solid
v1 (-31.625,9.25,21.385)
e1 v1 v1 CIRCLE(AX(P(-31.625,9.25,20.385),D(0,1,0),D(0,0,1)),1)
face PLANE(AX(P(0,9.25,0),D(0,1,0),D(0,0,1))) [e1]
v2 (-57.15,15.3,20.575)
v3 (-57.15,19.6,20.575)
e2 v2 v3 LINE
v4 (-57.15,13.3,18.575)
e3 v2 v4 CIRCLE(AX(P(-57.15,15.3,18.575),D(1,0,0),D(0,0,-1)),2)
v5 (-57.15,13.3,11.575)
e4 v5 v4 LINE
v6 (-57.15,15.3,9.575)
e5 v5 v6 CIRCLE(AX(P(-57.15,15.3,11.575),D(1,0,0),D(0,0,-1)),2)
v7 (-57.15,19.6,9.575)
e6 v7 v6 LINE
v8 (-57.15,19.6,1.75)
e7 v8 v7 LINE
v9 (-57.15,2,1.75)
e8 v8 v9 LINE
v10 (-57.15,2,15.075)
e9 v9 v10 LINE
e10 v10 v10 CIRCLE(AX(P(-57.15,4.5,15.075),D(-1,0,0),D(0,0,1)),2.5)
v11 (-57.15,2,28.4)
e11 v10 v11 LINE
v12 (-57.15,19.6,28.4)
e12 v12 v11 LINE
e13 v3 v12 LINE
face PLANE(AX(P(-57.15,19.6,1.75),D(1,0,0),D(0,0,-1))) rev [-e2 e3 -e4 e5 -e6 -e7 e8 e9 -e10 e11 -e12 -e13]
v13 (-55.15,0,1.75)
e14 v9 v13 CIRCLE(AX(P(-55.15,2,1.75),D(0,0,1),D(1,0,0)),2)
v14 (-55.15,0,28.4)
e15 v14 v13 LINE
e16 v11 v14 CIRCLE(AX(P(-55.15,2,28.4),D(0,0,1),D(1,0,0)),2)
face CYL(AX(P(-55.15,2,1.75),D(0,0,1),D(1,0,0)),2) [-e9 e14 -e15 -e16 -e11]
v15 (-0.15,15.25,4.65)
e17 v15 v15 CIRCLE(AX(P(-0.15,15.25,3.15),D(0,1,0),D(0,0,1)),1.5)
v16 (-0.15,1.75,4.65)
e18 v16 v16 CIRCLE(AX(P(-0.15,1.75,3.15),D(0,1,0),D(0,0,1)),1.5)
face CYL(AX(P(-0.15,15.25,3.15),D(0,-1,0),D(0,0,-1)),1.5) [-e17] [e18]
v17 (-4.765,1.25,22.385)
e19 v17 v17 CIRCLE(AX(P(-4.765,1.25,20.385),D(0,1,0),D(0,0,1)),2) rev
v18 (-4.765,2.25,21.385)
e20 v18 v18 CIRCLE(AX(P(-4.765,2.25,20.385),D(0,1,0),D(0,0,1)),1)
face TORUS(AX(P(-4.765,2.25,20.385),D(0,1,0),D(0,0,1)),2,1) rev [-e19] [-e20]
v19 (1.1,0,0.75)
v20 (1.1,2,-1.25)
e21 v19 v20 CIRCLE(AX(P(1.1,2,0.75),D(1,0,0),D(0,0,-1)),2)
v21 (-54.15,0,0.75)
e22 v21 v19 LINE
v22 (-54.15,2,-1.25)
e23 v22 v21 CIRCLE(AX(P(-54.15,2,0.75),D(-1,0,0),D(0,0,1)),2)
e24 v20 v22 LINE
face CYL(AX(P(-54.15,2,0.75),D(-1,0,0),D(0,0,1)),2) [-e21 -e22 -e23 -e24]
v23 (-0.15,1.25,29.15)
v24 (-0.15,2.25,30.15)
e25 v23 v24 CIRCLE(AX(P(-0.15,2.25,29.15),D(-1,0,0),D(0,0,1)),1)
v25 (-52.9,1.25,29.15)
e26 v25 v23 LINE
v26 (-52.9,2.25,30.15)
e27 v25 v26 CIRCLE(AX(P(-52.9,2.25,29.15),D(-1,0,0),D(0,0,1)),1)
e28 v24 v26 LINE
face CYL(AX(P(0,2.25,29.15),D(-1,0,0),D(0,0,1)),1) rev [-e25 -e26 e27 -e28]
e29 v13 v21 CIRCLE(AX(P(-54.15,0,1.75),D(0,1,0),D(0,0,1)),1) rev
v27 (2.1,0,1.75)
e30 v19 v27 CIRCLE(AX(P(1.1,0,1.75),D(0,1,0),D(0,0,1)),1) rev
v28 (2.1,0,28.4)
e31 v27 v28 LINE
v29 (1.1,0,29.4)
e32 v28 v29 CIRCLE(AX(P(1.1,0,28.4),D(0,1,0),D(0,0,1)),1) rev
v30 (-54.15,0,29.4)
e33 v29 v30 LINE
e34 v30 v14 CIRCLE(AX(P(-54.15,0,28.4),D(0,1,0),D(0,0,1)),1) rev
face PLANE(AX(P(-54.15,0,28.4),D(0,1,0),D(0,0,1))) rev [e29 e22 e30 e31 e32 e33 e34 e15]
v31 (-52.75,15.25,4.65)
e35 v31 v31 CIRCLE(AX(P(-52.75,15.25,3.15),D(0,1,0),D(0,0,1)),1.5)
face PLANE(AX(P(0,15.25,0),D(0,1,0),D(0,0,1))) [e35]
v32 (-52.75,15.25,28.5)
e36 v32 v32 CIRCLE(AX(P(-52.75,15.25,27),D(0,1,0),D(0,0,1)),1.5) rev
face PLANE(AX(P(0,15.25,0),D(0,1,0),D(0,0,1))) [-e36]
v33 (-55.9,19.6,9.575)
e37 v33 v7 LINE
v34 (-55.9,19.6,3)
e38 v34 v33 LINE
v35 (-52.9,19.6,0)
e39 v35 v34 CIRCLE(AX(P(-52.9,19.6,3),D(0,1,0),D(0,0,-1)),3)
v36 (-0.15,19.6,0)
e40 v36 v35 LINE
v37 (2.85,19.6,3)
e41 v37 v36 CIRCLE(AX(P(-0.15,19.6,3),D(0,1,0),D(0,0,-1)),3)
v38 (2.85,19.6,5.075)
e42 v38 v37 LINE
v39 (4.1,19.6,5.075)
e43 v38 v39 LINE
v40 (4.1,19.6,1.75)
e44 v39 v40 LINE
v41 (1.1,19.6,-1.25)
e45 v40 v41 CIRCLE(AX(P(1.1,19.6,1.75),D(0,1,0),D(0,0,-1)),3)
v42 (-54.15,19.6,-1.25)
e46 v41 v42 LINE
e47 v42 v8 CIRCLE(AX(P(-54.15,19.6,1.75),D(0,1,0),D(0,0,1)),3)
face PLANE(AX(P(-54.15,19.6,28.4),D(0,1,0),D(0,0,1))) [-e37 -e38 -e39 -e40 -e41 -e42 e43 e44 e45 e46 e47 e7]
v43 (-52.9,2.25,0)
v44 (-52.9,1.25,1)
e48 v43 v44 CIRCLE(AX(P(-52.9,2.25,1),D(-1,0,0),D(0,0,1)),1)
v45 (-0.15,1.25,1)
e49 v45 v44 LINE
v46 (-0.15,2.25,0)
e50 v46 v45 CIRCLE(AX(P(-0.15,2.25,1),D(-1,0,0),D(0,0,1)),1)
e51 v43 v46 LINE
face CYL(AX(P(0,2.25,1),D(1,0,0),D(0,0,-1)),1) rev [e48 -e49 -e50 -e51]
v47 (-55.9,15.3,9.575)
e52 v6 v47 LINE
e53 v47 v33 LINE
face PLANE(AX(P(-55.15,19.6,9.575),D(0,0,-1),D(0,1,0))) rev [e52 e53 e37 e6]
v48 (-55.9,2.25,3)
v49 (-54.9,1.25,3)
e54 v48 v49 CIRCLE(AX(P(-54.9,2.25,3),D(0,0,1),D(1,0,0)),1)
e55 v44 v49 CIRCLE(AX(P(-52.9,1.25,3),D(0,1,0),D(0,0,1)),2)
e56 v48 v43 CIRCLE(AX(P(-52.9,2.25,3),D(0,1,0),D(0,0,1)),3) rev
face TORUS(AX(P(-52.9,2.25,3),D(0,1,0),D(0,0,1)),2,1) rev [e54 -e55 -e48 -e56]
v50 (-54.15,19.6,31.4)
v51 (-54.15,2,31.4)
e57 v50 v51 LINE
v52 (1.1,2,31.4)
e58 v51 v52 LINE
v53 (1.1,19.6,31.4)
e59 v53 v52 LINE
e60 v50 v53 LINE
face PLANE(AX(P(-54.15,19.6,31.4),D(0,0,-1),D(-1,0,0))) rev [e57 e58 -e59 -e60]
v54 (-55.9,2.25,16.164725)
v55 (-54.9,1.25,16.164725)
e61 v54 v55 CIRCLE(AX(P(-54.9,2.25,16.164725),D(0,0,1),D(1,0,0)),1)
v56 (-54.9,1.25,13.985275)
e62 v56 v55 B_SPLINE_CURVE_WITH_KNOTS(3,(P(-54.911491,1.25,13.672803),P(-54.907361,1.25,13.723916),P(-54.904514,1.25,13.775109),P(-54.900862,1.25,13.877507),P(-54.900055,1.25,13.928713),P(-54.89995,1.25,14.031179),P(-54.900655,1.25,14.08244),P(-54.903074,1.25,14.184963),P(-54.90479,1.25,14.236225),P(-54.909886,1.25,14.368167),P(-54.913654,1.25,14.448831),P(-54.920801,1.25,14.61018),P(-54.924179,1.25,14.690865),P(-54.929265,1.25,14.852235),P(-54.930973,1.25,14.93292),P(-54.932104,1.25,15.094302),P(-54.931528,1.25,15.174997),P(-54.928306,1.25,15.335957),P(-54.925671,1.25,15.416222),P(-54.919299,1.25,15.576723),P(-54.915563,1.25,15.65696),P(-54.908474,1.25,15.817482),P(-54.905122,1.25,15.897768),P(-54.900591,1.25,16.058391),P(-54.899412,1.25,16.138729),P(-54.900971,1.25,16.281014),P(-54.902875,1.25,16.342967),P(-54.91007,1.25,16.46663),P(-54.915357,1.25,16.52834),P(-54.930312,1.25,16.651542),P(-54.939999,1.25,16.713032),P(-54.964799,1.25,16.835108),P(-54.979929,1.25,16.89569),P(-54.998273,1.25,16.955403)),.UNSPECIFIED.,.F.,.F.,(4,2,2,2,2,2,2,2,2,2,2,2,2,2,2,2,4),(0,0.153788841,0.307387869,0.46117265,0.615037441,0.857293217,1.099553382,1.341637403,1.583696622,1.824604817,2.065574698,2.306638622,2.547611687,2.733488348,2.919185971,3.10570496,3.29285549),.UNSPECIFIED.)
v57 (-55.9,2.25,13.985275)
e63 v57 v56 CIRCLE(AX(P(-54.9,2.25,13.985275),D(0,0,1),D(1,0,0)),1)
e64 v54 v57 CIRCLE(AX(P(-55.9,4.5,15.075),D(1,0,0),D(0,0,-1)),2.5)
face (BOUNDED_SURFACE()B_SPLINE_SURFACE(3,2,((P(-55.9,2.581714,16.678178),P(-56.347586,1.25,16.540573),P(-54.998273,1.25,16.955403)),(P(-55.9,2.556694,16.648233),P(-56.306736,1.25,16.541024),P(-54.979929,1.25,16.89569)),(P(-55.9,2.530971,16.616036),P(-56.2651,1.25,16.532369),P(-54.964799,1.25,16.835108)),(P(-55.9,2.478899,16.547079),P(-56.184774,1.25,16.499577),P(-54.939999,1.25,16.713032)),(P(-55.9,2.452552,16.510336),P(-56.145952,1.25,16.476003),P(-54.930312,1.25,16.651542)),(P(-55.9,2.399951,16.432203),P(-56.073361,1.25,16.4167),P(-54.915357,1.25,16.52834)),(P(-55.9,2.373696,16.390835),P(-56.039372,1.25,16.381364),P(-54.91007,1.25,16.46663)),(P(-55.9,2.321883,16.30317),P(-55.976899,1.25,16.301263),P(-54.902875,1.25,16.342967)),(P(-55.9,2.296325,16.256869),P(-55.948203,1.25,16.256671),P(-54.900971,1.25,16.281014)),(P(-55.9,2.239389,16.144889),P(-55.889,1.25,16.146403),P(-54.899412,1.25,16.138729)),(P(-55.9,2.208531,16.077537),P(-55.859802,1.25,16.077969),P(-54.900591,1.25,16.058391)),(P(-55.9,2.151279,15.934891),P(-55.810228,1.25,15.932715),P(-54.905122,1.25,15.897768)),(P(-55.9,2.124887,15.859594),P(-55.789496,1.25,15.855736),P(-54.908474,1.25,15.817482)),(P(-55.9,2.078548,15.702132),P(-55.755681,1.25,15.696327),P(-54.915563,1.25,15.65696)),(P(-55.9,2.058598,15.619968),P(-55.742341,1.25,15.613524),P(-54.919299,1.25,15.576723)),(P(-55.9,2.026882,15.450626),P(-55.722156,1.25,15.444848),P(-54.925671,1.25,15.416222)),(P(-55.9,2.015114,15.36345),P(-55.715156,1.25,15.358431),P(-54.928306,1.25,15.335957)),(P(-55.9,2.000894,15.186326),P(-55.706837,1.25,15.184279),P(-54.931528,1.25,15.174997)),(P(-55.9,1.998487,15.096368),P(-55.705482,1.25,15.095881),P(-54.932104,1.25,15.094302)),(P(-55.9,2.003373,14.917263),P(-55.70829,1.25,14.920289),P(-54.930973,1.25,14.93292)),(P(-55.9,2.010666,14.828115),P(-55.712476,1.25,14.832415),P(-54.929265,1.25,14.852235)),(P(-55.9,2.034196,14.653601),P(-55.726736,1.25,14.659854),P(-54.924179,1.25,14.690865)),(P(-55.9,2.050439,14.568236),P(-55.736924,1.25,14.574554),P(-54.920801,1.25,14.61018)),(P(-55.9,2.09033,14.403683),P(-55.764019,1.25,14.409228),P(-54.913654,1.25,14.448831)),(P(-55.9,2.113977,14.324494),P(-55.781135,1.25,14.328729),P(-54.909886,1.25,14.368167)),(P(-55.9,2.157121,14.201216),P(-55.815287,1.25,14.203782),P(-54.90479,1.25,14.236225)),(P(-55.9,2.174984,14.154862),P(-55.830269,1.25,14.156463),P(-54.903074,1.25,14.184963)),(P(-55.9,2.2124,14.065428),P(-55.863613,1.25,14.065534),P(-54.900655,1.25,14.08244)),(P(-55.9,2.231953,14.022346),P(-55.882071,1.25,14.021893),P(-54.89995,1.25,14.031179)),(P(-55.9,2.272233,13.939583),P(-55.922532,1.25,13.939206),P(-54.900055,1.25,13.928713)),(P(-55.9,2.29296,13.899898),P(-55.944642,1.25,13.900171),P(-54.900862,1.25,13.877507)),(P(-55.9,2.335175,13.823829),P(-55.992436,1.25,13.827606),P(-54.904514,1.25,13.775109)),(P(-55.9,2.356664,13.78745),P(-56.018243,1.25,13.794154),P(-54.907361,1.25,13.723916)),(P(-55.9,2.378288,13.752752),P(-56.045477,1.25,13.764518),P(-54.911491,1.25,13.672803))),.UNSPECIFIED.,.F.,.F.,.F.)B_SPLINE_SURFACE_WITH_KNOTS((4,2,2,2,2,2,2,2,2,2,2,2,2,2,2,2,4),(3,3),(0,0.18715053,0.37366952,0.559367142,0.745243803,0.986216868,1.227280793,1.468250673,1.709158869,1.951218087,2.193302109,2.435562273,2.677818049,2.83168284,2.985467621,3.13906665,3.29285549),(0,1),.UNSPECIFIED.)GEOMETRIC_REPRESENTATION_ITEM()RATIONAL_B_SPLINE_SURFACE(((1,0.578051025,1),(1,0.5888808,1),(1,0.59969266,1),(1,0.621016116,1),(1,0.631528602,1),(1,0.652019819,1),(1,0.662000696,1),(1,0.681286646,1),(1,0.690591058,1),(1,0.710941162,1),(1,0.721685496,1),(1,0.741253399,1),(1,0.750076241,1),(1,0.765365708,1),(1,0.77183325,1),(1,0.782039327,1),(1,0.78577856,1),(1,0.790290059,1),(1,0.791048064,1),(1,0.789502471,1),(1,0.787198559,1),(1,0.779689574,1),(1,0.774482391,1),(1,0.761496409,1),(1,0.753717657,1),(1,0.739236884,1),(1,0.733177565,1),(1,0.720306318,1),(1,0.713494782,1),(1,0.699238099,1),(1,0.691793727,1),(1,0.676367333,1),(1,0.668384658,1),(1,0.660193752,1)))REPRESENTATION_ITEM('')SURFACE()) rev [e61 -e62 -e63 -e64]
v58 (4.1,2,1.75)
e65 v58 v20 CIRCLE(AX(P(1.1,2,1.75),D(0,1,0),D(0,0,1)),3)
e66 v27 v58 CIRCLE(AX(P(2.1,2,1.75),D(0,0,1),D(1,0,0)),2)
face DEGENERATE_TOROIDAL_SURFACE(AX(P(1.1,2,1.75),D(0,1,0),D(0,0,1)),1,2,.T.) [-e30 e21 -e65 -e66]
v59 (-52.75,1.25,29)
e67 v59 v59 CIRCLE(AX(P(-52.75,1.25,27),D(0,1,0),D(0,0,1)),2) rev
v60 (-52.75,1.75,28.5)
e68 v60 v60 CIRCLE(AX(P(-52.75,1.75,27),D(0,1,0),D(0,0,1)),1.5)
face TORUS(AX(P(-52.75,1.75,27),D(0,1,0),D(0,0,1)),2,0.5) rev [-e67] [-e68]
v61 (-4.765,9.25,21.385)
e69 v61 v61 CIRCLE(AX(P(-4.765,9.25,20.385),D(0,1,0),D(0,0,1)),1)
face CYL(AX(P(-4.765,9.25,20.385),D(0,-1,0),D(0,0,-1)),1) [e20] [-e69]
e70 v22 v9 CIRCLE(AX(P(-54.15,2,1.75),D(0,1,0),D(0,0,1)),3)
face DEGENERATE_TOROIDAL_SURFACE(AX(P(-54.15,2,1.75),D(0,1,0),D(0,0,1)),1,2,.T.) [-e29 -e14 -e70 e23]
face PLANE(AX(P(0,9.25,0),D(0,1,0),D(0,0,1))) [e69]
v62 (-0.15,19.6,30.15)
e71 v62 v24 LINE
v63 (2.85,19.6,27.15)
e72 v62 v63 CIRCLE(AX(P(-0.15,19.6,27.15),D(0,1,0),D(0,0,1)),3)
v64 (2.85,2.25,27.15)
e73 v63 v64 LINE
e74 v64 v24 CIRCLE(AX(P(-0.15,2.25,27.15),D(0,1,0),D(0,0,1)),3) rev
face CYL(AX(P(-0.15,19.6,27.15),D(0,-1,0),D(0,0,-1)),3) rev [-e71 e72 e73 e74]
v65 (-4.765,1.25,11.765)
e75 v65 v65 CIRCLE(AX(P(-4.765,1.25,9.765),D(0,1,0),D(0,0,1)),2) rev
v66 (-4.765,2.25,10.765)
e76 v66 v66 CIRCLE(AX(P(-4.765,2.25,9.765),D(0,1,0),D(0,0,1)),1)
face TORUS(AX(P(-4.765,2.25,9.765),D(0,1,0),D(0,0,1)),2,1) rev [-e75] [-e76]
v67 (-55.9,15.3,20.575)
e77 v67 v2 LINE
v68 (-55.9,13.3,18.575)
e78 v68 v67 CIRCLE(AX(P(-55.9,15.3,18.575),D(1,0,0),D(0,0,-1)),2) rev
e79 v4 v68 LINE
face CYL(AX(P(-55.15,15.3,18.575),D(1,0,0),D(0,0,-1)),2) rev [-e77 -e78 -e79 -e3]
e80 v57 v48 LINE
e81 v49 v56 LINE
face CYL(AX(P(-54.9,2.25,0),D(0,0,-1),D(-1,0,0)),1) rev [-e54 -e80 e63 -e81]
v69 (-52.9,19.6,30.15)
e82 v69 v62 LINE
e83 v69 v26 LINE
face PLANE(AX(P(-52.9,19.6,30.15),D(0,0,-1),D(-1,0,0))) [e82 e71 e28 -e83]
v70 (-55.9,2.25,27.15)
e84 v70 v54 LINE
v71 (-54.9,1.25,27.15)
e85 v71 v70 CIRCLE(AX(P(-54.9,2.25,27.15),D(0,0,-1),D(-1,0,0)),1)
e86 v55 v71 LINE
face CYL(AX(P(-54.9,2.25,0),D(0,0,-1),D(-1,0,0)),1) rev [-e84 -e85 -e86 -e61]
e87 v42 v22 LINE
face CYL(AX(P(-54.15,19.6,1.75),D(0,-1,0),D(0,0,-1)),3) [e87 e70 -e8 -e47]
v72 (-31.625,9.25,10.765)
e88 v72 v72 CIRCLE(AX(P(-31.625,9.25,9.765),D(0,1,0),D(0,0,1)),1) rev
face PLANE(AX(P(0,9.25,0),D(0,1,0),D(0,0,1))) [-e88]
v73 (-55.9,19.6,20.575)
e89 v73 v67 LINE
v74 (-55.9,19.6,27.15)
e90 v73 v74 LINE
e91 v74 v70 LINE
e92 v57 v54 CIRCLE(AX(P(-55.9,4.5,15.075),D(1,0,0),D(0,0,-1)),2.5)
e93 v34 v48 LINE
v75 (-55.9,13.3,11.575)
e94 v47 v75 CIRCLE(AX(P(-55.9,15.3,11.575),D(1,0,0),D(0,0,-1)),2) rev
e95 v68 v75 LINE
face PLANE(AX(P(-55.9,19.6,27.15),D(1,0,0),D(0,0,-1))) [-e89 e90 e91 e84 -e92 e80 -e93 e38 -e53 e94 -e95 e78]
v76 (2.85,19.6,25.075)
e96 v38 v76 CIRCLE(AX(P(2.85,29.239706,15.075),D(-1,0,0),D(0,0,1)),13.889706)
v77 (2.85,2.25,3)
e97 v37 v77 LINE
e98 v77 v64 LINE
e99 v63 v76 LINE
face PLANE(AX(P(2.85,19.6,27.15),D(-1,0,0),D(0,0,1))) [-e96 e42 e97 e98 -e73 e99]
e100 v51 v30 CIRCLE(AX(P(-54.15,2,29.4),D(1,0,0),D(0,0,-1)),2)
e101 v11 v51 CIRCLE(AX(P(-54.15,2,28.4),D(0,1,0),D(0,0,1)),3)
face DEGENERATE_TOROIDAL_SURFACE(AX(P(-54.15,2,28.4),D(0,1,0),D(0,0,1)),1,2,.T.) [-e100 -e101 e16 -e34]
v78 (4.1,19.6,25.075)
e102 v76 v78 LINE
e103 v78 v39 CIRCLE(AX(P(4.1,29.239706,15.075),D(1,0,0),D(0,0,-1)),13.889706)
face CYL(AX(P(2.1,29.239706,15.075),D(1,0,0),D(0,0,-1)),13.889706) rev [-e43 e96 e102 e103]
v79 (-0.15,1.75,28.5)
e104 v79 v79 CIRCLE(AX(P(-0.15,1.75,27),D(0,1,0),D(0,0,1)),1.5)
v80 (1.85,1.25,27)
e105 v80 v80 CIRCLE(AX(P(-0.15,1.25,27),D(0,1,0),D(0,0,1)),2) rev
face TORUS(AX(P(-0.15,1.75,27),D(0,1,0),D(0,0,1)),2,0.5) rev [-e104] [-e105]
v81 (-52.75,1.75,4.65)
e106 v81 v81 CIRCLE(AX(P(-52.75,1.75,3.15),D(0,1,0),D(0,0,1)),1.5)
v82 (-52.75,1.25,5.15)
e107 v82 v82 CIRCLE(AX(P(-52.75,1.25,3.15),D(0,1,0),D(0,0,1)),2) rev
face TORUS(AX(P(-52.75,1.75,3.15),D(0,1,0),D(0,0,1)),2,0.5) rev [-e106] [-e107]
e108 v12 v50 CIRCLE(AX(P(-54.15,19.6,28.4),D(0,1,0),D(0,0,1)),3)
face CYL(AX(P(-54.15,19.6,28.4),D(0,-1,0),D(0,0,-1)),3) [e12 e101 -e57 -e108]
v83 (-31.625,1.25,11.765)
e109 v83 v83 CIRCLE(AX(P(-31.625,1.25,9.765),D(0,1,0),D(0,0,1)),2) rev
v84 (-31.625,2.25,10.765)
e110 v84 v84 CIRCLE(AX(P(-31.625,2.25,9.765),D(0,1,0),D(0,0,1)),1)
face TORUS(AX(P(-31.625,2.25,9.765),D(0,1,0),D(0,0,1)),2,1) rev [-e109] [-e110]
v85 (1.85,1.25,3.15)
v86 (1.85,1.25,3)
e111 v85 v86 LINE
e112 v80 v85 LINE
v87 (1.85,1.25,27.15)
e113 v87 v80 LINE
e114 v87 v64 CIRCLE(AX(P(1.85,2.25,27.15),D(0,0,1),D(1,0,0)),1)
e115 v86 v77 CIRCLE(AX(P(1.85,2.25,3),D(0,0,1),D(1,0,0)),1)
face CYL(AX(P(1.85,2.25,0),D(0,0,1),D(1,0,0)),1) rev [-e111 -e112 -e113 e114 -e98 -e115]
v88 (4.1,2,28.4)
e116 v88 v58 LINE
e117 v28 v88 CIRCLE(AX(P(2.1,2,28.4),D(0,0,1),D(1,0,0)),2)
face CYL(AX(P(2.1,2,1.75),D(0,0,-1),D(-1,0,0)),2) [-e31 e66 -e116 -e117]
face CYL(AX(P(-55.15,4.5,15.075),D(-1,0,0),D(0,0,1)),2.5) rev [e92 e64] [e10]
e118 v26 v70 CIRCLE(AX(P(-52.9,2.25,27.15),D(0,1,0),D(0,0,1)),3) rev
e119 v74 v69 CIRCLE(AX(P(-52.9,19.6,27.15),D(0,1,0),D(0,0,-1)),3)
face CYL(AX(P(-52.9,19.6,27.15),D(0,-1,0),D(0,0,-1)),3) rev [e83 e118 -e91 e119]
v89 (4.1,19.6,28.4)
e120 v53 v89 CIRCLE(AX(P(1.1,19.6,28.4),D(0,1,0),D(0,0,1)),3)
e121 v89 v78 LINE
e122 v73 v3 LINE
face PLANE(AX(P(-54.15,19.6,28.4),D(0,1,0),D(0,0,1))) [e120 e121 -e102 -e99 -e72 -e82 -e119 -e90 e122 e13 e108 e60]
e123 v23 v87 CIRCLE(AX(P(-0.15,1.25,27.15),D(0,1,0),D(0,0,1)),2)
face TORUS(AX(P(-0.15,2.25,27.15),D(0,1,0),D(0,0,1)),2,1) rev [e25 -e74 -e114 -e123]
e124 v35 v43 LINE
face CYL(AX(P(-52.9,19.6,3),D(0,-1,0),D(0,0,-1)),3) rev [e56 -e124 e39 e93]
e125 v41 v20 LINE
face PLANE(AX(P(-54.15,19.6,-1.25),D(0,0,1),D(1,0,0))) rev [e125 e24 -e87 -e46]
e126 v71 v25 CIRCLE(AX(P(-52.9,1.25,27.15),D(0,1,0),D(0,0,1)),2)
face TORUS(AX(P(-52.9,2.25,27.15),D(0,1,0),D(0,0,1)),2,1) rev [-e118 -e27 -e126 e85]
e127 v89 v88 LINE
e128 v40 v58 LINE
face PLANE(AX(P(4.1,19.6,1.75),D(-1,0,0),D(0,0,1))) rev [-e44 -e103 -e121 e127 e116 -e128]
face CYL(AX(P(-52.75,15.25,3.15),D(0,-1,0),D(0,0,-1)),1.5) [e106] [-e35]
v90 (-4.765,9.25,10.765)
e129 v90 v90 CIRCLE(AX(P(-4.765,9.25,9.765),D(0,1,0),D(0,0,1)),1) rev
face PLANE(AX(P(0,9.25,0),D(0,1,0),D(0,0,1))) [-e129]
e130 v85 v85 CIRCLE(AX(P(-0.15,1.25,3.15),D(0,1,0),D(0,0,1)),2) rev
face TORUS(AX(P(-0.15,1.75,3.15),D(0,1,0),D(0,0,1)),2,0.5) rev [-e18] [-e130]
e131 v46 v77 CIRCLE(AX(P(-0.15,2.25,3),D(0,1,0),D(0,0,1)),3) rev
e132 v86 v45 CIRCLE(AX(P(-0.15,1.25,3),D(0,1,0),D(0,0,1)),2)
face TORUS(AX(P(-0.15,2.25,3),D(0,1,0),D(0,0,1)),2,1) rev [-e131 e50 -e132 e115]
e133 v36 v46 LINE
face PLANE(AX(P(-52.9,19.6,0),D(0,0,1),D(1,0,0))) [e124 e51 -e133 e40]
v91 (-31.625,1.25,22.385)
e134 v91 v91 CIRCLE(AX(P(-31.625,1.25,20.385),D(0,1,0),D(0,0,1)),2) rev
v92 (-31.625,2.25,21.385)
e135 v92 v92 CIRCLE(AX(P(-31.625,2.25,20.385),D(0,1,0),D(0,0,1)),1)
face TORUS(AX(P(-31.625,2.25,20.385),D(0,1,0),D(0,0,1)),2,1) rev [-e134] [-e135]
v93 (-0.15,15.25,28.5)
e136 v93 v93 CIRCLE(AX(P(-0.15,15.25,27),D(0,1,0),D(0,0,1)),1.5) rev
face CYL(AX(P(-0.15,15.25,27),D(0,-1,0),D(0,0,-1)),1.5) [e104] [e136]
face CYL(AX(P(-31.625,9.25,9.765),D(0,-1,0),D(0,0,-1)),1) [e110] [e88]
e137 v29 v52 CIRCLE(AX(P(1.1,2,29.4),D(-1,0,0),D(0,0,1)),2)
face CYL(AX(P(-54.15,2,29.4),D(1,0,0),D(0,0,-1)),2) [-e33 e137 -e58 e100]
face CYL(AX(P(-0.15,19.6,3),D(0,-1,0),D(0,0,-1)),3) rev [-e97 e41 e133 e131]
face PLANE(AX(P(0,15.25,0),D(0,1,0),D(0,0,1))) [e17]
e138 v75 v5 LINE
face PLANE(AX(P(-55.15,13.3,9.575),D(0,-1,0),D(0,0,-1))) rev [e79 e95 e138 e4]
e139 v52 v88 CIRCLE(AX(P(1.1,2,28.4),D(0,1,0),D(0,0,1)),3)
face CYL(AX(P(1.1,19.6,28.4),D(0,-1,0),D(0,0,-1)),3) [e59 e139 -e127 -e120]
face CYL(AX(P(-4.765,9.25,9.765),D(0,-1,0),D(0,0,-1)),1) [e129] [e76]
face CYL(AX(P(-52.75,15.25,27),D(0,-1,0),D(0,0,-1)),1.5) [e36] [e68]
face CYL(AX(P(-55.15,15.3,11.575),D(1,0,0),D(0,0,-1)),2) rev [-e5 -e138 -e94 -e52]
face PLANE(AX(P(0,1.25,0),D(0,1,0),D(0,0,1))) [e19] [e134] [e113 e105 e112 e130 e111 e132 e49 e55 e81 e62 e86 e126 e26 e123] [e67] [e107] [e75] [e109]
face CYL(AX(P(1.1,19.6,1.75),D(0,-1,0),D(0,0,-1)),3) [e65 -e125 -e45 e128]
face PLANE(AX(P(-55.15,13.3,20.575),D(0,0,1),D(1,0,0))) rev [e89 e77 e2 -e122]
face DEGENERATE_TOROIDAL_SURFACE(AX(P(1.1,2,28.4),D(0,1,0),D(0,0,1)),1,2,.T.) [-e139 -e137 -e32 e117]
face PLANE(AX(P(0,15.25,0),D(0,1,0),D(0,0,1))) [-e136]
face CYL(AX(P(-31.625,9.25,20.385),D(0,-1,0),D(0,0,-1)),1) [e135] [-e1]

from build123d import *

# Parameters (mm, degrees)
BOSS_EXTRUDE2_DEPTH = 19.6
SKETCH3_W           = 58.75
SKETCH3_H           = 30.15
BOSS_EXTRUDE3_DEPTH = 1.25
SKETCH5_R           = 1.5
BOSS_EXTRUDE4_DEPTH = 14
FILLET1_R           = 0.5
SKETCH6_R           = 1
BOSS_EXTRUDE6_DEPTH = 8
FILLET3_R           = 1
FILLET4_R           = 2
SKETCH7_R           = 2.5
SKETCH7_W           = 11
SKETCH7_H           = 6.3
CUT_EXTRUDE1_DEPTH  = 2
FILLET7_R           = 1
CUT_EXTRUDE2_DEPTH  = 2
FILLET8_R           = 2


with BuildPart() as part:
    # Sketch2 → Boss-Extrude2 (new body)
    with BuildSketch(Plane(origin=(0, 0, 0), x_dir=(1, 0, 0), z_dir=(0, 1, 0))):
        with BuildLine():
            Line((-54.15, 1.25), (1.1, 1.25))
            ThreePointArc((1.1, 1.25), (3.221320344, 0.371320344), (4.1, -1.75))
            Line((4.1, -1.75), (4.1, -28.4))
            ThreePointArc((4.1, -28.4), (3.221320344, -30.521320344), (1.1, -31.4))
            Line((1.1, -31.4), (-54.15, -31.4))
            ThreePointArc((-54.15, -31.4), (-56.271320344, -30.521320344), (-57.15, -28.4))
            Line((-57.15, -28.4), (-57.15, -1.75))
            ThreePointArc((-57.15, -1.75), (-56.271320344, 0.371320344), (-54.15, 1.25))
        make_face()
        with BuildLine():
            Line((-52.9, -30.15), (-0.15, -30.15))
            ThreePointArc((-0.15, -30.15), (1.971320344, -29.271320344), (2.85, -27.15))
            Line((2.85, -27.15), (2.85, -3))
            ThreePointArc((2.85, -3), (1.971320344, -0.878679656), (-0.15, 0))
            Line((-0.15, 0), (-52.9, 0))
            ThreePointArc((-52.9, 0), (-55.021320344, -0.878679656), (-55.9, -3))
            Line((-55.9, -3), (-55.9, -27.15))
            ThreePointArc((-55.9, -27.15), (-55.021320344, -29.271320344), (-52.9, -30.15))
        make_face(mode=Mode.SUBTRACT)
    extrude(amount=BOSS_EXTRUDE2_DEPTH)

    # Sketch3 → Boss-Extrude3 (add)
    with BuildSketch(Plane(origin=(0, 0, 0), x_dir=(1, 0, 0), z_dir=(0, 1, 0))):
        with Locations((-26.525, -15.075)):
            Rectangle(SKETCH3_W, SKETCH3_H)
    extrude(amount=BOSS_EXTRUDE3_DEPTH)

    # Sketch5 → Boss-Extrude4 (add)
    with BuildSketch(Plane(origin=(0, 1.25, 0), x_dir=(1, 0, 0), z_dir=(0, 1, 0))):
        with Locations(Location((-52.75, -3.15, 0), (0, 0, 270))):
            Circle(SKETCH5_R)
        with Locations(Location((-0.15, -3.15, 0), (0, 0, 270))):
            Circle(SKETCH5_R)
        with Locations(Location((-0.15, -27, 0), (0, 0, 270))):
            Circle(SKETCH5_R)
        with Locations(Location((-52.75, -27, 0), (0, 0, 270))):
            Circle(SKETCH5_R)
    extrude(amount=BOSS_EXTRUDE4_DEPTH)

    # Fillet1
    fillet1_edges = [part.edges().sort_by_distance(p)[0] for p in [
        (-52.75, 1.25, 25.5),
        (-52.75, 1.25, 1.65),
        (-0.15, 1.25, 1.65),
        (-0.15, 1.25, 25.5),
    ]]
    fillet(fillet1_edges, radius=FILLET1_R)

    # Sketch6 → Boss-Extrude6 (add)
    with BuildSketch(Plane(origin=(0, 1.25, 0), x_dir=(1, 0, 0), z_dir=(0, 1, 0))):
        with Locations(Location((-31.625, -20.385, 0), (0, 0, 270))):
            Circle(SKETCH6_R)
        with Locations(Location((-31.625, -9.765, 0), (0, 0, 270))):
            Circle(SKETCH6_R)
        with Locations(Location((-4.765, -9.765, 0), (0, 0, 270))):
            Circle(SKETCH6_R)
        with Locations(Location((-4.765, -20.385, 0), (0, 0, 270))):
            Circle(SKETCH6_R)
    extrude(amount=BOSS_EXTRUDE6_DEPTH)

    # Fillet3
    fillet3_edges = [part.edges().sort_by_distance(p)[0] for p in [
        (-31.625, 1.25, 19.385),
        (-31.625, 1.25, 8.765),
        (-4.765, 1.25, 8.765),
        (-4.765, 1.25, 19.385),
    ]]
    fillet(fillet3_edges, radius=FILLET3_R)

    # Fillet4
    fillet4_edges = [part.edges().sort_by_distance(p)[0] for p in [
        (4.1, 0, 15.075),
        (3.221320344, 0, 30.521320344),
        (-26.525, 0, 31.4),
        (-56.271320344, 0, 30.521320344),
        (-57.15, 0, 15.075),
        (-56.271320344, 0, -0.371320344),
        (-26.525, 0, -1.25),
        (3.221320344, 0, -0.371320344),
    ]]
    fillet(fillet4_edges, radius=FILLET4_R)

    # Sketch7 → Cut-Extrude1 (cut)
    with BuildSketch(Plane.ZY.offset(57.15)):
        with Locations(Location((15.075, 4.5, 0), (0, 0, 270))):
            Circle(SKETCH7_R)
        with Locations((15.075, 16.45)):
            Rectangle(SKETCH7_W, SKETCH7_H)
    extrude(amount=-CUT_EXTRUDE1_DEPTH, mode=Mode.SUBTRACT)

    # Fillet7
    fillet7_edges = [part.edges().sort_by_distance(p)[0] for p in [
        (-55.9, 1.25, 15.075),
        (-55.021320344, 1.25, 29.271320344),
        (-26.525, 1.25, 30.15),
        (1.971320344, 1.25, 29.271320344),
        (2.85, 1.25, 15.075),
        (1.971320344, 1.25, 0.878679656),
        (-26.525, 1.25, 0),
        (-55.021320344, 1.25, 0.878679656),
    ]]
    fillet(fillet7_edges, radius=FILLET7_R - 0.0001)  # a hair under: the kernel refuses the full size

    # Sketch8 → Cut-Extrude2 (cut)
    with BuildSketch(Plane(origin=(4.1, 0, 0), x_dir=(0, 0, -1), z_dir=(1, 0, 0))):
        with BuildLine():
            Line((-5.075, 19.6), (-15.075, 19.6))
            Line((-15.075, 19.6), (-15.075, 15.35))
            ThreePointArc((-15.075, 15.35), (-9.642171547, 16.456580111), (-5.075, 19.6))
        make_face()
        with BuildLine():
            Line((-15.075, 15.35), (-15.075, 19.6))
            Line((-15.075, 19.6), (-25.075, 19.6))
            ThreePointArc((-25.075, 19.6), (-20.507828453, 16.456580111), (-15.075, 15.35))
        make_face()
    extrude(amount=-CUT_EXTRUDE2_DEPTH, mode=Mode.SUBTRACT)

    # Fillet8
    fillet8_edges = [part.edges().sort_by_distance(p)[0] for p in [
        (-56.525, 13.3, 20.575),
        (-56.525, 13.3, 9.575),
    ]]
    fillet(fillet8_edges, radius=FILLET8_R)


solid = part.part
